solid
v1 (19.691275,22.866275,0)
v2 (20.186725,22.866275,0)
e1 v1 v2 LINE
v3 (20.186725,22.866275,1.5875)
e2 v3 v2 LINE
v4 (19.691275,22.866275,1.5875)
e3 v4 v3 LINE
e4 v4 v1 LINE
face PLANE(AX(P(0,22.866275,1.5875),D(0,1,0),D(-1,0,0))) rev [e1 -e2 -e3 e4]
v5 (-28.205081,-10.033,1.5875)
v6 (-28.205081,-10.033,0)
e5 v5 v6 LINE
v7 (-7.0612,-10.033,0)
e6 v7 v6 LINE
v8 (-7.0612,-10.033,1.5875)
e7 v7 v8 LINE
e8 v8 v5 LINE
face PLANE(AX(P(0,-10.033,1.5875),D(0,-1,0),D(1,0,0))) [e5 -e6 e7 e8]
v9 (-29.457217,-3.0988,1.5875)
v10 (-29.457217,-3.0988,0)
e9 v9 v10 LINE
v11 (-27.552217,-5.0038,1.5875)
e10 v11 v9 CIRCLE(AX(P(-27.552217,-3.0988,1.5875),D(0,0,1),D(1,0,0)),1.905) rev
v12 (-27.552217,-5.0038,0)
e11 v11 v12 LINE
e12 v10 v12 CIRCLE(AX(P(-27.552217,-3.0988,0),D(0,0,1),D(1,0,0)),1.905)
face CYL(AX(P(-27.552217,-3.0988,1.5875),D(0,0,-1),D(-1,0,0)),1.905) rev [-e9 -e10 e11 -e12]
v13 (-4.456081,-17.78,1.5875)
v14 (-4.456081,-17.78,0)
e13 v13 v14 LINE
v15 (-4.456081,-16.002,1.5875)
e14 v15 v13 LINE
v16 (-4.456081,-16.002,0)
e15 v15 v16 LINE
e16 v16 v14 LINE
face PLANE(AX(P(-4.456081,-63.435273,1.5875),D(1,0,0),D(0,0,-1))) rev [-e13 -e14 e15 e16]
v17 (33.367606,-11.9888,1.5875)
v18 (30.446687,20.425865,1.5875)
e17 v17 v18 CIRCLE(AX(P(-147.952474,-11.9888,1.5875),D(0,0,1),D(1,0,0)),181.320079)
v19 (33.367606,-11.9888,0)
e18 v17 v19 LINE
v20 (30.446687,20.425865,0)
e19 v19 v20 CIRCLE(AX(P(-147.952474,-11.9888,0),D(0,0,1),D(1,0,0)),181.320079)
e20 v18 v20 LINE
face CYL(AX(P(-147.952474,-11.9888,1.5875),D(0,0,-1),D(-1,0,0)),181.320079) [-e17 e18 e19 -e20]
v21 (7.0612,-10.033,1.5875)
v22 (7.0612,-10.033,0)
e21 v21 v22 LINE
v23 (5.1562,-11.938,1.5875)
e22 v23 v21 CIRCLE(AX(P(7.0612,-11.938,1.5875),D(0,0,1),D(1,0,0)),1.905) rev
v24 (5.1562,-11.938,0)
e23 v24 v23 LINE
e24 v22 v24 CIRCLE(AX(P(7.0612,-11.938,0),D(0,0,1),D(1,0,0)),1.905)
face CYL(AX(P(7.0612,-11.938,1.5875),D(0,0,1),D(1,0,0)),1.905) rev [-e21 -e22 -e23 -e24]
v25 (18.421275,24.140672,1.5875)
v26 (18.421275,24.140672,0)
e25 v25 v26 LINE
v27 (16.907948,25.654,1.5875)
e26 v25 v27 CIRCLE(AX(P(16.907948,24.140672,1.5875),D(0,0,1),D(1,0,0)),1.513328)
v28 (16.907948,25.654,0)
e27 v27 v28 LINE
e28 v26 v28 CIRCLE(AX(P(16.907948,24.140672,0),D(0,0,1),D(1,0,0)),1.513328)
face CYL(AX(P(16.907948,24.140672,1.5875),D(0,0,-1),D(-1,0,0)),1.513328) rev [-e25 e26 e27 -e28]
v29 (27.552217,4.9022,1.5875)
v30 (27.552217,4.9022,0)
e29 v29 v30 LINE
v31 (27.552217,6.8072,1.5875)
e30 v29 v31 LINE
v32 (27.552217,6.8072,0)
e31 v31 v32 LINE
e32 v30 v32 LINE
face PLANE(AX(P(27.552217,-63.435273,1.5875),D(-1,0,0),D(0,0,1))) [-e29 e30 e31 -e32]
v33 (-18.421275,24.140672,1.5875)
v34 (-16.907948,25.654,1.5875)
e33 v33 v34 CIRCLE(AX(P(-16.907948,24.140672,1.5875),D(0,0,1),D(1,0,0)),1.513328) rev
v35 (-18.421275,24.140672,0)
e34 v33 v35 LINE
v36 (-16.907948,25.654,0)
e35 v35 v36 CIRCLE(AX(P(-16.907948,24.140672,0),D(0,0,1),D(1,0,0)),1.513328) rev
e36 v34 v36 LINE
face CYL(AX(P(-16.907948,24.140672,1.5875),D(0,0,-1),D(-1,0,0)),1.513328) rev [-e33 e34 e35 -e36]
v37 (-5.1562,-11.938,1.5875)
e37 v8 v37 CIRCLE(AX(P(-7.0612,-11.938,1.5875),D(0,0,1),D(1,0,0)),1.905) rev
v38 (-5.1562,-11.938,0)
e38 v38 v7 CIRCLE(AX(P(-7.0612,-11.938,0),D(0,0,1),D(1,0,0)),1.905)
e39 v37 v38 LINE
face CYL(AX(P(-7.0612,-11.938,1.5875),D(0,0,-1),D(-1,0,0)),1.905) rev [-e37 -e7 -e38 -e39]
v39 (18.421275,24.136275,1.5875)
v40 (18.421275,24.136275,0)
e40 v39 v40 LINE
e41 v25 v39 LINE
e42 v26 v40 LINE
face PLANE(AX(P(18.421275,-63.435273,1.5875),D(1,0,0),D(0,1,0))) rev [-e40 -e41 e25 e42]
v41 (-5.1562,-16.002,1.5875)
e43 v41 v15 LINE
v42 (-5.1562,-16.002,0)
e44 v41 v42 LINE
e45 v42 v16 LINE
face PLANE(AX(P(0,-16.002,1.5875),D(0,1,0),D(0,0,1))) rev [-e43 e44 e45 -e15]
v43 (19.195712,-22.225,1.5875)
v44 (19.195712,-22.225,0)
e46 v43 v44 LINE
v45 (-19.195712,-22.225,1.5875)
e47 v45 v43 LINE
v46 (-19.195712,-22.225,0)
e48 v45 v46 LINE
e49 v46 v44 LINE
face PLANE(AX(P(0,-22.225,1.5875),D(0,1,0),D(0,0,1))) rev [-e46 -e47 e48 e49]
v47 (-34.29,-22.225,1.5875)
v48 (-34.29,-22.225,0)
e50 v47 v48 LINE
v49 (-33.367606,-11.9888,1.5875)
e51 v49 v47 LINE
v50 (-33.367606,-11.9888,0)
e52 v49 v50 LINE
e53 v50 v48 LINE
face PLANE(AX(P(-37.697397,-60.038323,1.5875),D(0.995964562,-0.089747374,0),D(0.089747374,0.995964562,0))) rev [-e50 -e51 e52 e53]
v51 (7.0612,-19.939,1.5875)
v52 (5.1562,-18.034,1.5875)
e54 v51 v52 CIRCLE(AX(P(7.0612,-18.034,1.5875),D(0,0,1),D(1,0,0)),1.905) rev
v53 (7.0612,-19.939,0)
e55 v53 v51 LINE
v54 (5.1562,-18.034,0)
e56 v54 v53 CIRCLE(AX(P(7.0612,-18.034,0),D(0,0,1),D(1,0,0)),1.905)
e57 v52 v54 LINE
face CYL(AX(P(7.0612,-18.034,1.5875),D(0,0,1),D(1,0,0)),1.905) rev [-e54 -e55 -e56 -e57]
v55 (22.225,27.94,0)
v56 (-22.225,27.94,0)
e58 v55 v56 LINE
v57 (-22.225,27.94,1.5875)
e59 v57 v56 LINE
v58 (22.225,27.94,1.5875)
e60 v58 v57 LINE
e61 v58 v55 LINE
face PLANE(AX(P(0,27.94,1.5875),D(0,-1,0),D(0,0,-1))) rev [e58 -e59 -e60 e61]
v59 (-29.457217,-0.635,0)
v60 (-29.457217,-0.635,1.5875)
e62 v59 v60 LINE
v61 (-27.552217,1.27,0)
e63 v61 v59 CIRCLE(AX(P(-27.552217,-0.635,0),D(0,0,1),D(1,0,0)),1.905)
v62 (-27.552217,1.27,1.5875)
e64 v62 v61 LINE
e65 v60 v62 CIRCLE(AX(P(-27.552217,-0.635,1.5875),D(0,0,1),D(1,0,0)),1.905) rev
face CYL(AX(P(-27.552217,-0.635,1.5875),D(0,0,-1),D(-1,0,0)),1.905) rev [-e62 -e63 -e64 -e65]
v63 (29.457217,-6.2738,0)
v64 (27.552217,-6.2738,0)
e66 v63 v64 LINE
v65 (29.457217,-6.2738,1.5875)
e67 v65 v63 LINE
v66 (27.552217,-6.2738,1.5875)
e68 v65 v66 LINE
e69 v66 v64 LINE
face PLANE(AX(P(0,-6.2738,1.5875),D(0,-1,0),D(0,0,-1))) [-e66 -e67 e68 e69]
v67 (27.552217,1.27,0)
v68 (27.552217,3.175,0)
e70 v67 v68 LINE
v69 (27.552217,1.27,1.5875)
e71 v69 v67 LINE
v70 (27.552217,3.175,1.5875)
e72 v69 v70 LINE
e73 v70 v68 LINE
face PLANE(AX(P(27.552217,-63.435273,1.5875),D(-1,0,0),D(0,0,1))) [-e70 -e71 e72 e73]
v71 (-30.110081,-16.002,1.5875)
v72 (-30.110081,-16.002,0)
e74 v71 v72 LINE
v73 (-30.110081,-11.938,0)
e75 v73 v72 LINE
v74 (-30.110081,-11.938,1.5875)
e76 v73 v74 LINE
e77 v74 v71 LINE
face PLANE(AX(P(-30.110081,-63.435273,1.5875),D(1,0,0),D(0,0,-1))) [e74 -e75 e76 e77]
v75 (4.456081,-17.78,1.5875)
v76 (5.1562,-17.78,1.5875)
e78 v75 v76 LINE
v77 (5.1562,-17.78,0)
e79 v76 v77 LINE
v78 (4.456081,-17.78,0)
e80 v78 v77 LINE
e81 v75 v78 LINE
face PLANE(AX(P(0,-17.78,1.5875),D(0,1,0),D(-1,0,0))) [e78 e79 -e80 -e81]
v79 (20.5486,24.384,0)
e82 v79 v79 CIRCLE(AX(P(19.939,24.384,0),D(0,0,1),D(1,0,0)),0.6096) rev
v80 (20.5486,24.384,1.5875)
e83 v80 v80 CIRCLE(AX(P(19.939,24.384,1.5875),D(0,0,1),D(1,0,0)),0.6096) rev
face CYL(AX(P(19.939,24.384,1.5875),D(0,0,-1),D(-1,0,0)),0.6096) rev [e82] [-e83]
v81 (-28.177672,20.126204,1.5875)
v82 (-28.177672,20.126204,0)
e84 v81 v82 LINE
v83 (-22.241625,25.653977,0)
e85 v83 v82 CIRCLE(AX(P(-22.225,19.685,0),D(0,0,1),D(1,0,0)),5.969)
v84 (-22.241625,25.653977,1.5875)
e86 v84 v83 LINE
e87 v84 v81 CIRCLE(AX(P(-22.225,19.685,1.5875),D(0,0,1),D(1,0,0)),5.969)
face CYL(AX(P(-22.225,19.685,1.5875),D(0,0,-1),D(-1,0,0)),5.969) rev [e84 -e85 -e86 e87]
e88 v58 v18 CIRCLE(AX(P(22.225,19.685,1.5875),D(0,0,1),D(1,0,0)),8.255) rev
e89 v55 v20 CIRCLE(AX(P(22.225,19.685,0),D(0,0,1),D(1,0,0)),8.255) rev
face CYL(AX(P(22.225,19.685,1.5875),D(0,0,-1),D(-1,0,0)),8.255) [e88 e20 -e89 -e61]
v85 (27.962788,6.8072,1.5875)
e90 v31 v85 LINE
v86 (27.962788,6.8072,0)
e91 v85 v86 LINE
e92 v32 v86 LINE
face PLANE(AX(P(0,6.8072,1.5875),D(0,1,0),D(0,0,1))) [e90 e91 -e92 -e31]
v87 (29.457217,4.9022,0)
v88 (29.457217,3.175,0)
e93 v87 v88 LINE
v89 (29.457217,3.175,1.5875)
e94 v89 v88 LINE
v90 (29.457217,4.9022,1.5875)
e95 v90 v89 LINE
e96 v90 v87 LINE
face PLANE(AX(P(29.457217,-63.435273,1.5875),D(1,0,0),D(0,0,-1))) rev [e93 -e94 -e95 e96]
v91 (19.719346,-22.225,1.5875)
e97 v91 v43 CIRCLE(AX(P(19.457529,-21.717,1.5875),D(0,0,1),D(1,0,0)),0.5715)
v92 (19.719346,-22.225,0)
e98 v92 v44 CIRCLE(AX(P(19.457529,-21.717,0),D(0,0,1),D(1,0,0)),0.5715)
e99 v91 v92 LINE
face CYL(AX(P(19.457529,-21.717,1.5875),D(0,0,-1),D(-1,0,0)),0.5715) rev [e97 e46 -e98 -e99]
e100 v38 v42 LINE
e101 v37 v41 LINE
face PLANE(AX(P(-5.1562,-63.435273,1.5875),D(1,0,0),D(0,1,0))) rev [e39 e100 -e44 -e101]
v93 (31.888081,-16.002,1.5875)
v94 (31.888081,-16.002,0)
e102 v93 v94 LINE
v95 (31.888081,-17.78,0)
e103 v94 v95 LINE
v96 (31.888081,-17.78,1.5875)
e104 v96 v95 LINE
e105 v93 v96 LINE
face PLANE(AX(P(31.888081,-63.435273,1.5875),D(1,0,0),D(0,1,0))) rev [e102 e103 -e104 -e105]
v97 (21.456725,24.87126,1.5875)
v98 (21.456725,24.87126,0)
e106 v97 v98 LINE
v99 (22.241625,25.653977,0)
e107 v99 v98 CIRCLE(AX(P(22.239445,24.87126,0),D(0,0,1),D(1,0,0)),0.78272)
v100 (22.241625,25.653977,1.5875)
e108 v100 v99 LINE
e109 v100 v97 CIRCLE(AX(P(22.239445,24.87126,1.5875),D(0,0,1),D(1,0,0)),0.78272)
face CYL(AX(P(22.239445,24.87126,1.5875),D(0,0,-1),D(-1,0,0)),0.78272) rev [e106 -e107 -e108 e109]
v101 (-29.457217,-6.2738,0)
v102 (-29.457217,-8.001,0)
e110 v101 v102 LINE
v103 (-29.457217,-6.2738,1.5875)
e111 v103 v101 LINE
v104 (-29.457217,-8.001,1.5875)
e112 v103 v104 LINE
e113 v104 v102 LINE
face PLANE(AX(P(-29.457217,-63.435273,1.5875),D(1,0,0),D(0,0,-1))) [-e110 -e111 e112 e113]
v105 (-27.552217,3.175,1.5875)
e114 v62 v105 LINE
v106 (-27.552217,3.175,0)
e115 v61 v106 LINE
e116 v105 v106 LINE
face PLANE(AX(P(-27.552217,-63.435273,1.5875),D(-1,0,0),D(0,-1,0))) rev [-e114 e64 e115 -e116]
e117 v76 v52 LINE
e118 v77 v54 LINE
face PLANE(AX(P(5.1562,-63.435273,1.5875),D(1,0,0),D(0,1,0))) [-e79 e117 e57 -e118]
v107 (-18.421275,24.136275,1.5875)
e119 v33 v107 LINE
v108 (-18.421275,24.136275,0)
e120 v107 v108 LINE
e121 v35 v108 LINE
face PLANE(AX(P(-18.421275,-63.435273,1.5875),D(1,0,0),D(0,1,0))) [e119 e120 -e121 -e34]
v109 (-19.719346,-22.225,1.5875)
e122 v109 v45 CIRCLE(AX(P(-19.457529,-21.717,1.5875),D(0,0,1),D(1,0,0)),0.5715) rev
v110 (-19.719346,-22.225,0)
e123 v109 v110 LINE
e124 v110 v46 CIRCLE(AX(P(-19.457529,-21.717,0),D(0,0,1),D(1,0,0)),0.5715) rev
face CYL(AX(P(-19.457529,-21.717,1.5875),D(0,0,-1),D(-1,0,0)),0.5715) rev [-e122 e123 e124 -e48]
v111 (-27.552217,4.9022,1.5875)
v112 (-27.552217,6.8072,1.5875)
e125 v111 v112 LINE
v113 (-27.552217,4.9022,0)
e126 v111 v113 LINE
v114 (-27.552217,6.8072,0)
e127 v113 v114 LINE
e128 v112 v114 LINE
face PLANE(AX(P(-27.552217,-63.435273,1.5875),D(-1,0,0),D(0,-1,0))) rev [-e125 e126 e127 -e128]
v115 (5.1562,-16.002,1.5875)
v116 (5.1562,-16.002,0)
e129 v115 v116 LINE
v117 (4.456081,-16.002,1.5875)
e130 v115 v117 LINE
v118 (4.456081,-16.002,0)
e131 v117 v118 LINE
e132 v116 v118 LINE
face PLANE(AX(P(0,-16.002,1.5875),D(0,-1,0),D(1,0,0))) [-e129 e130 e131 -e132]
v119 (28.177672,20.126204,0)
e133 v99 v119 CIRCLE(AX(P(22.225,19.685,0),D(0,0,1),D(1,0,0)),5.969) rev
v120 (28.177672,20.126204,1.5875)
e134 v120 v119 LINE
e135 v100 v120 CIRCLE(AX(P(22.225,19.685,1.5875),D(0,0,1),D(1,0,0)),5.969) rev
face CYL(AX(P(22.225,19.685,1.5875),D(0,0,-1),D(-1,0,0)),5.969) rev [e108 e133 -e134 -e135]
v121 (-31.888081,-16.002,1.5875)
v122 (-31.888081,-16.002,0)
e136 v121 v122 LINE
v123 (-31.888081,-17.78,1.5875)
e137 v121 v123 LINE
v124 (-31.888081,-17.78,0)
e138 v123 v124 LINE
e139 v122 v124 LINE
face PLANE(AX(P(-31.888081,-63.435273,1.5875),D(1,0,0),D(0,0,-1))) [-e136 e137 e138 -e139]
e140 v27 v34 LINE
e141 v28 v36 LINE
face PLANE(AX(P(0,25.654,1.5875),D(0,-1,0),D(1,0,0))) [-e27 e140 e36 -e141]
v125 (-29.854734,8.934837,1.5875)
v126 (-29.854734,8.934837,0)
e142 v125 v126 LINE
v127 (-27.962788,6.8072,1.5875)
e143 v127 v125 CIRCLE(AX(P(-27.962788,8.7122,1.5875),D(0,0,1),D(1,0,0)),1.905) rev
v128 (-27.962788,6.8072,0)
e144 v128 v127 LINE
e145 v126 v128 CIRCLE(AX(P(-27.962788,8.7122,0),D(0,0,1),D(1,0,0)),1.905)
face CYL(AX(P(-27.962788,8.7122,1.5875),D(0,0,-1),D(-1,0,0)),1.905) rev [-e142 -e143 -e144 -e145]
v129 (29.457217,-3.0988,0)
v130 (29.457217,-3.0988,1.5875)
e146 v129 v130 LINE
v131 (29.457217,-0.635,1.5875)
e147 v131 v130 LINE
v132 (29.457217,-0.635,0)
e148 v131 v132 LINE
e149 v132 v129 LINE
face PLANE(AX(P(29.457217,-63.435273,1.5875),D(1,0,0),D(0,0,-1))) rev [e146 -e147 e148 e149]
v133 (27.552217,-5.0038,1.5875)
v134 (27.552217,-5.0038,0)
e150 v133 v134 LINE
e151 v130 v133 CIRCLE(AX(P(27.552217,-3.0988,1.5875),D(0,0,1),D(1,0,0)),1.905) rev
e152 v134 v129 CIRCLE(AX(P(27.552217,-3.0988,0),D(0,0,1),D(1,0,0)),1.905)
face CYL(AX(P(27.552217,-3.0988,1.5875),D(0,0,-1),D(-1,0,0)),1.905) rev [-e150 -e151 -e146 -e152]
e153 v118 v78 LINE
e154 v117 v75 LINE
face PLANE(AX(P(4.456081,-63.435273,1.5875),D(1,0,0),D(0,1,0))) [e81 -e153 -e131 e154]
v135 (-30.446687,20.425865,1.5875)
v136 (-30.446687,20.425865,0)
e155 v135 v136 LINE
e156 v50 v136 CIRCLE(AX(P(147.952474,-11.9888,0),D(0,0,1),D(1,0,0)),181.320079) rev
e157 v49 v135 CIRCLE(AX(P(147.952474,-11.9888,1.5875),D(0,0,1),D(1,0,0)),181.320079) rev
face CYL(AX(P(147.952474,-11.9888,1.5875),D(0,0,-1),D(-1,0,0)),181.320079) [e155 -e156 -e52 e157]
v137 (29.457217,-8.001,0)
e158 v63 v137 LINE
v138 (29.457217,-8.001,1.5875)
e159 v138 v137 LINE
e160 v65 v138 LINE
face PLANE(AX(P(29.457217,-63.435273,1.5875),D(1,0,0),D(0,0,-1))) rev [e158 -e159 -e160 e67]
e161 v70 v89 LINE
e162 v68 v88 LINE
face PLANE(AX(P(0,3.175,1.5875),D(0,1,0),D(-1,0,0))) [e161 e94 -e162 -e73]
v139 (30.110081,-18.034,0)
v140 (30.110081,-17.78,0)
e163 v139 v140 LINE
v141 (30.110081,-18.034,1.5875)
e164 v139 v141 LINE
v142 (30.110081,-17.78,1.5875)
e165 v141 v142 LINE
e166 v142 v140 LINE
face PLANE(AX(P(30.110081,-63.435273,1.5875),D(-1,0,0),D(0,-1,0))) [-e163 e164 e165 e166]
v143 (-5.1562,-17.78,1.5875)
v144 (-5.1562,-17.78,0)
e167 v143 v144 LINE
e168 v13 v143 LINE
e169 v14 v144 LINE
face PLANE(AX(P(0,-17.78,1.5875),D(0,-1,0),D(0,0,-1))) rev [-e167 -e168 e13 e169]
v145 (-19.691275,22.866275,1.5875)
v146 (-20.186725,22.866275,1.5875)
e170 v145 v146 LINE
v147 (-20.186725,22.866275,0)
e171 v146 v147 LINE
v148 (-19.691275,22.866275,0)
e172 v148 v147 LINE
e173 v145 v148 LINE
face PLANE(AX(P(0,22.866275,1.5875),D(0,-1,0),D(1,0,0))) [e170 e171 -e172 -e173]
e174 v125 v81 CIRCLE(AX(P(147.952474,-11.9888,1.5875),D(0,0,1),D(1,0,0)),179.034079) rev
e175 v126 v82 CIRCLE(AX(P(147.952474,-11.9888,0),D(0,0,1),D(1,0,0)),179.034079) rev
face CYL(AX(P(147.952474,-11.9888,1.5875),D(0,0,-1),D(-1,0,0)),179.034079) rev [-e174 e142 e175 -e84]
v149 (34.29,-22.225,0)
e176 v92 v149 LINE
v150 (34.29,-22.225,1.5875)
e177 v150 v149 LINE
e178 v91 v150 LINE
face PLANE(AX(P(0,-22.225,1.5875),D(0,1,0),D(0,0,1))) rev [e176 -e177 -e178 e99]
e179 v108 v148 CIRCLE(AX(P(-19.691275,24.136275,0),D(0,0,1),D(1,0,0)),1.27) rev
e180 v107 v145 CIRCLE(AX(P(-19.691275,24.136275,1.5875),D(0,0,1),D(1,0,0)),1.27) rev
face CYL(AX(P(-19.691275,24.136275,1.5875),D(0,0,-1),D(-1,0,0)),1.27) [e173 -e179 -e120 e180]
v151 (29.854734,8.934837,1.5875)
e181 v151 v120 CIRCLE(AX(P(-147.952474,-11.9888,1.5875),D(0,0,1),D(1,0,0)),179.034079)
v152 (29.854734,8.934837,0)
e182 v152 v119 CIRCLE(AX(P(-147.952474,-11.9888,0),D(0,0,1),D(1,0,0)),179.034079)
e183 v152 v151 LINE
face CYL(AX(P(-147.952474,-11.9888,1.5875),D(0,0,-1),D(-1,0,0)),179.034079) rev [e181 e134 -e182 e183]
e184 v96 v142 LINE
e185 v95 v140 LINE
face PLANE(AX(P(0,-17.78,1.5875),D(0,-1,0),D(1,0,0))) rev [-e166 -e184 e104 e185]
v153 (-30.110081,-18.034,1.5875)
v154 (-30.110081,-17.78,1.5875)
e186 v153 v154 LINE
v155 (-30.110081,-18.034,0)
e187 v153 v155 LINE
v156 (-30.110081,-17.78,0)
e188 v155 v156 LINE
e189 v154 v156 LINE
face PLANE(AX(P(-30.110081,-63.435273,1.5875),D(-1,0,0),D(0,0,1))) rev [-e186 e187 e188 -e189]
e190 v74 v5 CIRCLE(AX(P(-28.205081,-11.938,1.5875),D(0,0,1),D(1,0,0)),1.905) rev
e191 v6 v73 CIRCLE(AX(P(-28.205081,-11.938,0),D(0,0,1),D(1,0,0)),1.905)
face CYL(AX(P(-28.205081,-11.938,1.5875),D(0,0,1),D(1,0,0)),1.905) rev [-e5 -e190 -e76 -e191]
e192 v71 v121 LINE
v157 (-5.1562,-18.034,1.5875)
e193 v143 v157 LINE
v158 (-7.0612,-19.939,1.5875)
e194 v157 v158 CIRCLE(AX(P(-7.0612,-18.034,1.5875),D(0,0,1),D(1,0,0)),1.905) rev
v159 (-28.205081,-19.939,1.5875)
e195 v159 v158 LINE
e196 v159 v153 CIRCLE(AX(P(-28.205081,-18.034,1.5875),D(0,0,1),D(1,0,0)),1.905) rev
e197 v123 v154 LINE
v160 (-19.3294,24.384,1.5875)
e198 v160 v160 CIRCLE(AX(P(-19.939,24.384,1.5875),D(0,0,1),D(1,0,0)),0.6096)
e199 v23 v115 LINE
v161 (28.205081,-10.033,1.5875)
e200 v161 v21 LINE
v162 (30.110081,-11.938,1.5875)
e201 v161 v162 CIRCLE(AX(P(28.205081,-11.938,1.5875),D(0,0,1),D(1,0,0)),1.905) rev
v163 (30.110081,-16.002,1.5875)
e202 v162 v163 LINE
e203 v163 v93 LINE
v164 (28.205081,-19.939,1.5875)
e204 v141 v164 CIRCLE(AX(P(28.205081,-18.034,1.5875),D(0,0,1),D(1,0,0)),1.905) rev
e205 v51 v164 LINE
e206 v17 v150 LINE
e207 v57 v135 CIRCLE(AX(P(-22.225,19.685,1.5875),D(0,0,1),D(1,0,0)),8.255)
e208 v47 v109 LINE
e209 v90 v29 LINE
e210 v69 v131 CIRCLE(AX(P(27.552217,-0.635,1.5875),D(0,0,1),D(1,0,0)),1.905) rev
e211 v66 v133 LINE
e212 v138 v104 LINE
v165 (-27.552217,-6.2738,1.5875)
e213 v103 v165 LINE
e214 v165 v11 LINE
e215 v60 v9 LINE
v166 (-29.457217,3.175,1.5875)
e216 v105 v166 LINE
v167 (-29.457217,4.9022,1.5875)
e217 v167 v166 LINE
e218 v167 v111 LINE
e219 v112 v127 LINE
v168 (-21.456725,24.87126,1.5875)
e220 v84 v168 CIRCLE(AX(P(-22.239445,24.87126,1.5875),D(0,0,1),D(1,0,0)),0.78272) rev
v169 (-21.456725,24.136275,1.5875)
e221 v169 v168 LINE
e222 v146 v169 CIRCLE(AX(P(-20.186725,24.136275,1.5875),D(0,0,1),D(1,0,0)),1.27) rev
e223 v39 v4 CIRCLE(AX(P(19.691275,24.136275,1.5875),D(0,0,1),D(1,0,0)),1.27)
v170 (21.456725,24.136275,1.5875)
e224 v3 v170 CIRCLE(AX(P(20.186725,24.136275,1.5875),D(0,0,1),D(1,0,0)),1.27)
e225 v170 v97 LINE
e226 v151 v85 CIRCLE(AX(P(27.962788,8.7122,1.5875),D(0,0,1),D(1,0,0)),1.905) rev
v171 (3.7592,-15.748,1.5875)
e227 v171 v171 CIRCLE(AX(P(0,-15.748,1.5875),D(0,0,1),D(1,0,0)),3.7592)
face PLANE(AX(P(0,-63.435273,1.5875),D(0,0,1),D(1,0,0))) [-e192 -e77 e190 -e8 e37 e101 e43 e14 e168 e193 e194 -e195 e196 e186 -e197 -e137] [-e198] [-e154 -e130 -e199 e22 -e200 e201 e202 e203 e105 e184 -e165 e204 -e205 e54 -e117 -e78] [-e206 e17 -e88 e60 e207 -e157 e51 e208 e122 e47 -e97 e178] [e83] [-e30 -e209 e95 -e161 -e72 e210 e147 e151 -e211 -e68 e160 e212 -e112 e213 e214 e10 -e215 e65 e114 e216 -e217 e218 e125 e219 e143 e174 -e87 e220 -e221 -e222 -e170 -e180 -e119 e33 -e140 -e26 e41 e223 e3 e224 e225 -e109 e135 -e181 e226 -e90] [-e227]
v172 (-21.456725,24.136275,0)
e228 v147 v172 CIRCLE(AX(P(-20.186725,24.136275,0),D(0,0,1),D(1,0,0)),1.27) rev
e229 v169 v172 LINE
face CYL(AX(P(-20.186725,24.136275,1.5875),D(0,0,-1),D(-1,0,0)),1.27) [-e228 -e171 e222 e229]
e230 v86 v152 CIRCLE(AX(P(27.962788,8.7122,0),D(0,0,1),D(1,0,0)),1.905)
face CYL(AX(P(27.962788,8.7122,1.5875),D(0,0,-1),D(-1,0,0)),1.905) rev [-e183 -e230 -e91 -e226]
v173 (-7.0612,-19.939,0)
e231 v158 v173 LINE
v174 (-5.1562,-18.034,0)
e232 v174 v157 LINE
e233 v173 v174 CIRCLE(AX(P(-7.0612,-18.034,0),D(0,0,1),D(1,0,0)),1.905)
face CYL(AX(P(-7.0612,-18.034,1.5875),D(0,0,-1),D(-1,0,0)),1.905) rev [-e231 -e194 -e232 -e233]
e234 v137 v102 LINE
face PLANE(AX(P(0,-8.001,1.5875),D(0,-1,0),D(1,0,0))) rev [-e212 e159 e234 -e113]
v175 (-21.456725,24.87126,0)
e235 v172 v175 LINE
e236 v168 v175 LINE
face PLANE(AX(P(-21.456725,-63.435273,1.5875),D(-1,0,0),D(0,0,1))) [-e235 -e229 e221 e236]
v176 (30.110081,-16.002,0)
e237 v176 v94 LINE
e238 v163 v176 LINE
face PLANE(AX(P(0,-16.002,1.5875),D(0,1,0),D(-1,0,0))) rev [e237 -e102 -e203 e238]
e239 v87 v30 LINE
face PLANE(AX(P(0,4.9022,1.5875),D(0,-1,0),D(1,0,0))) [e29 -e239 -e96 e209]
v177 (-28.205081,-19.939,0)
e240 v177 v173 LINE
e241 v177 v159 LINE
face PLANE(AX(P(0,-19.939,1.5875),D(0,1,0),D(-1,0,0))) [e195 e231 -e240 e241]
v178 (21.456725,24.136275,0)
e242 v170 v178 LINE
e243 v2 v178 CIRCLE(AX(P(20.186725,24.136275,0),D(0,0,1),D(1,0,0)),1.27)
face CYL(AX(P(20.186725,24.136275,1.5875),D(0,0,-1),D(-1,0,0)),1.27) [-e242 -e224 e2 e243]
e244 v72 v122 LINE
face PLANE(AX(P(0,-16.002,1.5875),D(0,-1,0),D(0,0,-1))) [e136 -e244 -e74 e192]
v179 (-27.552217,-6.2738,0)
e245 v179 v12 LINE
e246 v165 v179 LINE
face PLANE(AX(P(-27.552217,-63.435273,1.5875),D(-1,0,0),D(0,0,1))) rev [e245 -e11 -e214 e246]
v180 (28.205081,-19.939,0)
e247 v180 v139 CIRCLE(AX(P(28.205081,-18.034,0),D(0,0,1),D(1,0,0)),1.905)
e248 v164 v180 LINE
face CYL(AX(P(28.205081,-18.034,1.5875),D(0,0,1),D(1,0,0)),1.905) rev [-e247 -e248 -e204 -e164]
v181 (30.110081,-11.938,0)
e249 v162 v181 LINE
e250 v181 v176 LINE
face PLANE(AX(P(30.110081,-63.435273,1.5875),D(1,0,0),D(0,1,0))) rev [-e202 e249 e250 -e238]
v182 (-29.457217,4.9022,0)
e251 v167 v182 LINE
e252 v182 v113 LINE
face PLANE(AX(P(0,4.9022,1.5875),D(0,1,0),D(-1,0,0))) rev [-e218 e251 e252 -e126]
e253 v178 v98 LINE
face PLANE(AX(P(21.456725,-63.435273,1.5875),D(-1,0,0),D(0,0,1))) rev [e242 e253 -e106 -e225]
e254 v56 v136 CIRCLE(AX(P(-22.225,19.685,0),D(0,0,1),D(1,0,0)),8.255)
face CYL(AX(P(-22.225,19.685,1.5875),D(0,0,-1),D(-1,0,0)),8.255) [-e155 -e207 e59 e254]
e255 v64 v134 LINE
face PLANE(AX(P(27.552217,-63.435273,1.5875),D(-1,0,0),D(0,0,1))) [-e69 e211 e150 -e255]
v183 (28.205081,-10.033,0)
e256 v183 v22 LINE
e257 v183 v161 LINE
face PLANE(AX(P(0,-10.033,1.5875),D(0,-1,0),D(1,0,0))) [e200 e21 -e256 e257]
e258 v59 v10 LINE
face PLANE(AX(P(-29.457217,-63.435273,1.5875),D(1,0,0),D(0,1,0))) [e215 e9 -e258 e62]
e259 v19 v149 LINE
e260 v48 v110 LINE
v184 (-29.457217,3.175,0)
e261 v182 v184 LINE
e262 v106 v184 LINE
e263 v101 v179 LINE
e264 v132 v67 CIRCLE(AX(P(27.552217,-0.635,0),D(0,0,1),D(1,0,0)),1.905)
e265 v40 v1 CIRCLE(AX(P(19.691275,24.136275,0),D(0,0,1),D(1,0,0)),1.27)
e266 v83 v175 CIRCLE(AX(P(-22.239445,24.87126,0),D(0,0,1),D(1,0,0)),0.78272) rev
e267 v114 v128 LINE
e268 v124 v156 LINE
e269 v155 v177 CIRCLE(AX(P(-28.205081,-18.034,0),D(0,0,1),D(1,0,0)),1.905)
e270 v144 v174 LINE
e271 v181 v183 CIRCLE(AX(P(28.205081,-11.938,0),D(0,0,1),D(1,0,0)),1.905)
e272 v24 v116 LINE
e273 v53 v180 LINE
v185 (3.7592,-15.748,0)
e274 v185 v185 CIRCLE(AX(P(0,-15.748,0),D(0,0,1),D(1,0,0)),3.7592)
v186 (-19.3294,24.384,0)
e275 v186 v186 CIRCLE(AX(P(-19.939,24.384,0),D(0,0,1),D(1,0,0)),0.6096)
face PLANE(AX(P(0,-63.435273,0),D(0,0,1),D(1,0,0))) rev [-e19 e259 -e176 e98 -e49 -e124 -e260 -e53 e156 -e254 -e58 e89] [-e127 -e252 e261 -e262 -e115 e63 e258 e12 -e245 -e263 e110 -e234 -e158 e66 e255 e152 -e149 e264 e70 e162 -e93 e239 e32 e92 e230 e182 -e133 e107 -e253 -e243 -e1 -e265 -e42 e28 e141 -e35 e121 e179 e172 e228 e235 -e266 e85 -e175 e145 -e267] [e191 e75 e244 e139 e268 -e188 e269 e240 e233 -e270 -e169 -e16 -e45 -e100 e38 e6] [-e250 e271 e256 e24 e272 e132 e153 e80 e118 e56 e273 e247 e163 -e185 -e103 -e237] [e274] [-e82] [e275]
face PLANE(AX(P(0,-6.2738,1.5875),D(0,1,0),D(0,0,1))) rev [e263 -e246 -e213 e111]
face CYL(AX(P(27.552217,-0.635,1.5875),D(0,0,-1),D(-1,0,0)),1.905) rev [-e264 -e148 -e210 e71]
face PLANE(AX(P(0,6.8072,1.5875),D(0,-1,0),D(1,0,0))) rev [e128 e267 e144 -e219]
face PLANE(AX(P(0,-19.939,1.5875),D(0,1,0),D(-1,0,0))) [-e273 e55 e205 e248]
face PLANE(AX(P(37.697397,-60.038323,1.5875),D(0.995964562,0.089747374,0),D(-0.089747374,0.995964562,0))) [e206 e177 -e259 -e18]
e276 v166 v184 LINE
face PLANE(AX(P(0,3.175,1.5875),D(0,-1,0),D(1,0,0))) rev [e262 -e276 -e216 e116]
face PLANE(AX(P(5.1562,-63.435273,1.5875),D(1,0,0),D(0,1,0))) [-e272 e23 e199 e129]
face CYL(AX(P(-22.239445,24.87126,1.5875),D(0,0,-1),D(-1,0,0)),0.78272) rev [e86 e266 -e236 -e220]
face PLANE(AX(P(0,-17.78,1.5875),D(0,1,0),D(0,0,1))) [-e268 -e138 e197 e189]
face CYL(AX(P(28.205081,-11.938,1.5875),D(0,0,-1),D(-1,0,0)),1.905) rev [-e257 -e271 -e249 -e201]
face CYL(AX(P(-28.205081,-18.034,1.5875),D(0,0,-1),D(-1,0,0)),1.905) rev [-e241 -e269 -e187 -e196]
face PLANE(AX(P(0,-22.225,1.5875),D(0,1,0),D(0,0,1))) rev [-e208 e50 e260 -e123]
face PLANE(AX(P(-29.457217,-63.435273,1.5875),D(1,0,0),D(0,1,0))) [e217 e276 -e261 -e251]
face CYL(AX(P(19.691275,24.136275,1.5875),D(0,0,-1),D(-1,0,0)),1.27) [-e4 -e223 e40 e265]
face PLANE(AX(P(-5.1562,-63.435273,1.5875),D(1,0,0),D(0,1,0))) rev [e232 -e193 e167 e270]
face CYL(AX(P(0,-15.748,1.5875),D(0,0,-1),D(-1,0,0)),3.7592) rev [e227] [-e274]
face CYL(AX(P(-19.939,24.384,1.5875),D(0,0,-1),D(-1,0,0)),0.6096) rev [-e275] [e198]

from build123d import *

# Parameters (mm, degrees)
SKETCH1_R           = 3.7592
SKETCH1_R_2         = 0.6096
BOSS_EXTRUDE1_DEPTH = 1.5875
FILLET1_R           = 1.905
FILLET2_R           = 1.905


with BuildPart() as part:
    # Sketch1 → Boss-Extrude1 (new body)
    with BuildSketch(Plane.XY):
        with BuildLine():
            Line((34.29, -22.225), (33.367605666, -11.9888))
            ThreePointArc((33.367605666, -11.9888), (32.635899737, 4.284200971), (30.44668746, 20.425864572))
            ThreePointArc((30.44668746, 20.425864572), (27.794074787, 25.778474462), (22.225, 27.94))
            Line((22.225, 27.94), (-22.225, 27.94))
            ThreePointArc((-22.225, 27.94), (-27.794074787, 25.778474462), (-30.44668746, 20.425864572))
            ThreePointArc((-30.44668746, 20.425864572), (-32.635899737, 4.284200971), (-33.367605666, -11.9888))
            Line((-33.367605666, -11.9888), (-34.29, -22.225))
            Line((-34.29, -22.225), (-19.719346062, -22.225))
            ThreePointArc((-19.719346062, -22.225), (-19.755004666, -21.229024189), (-18.886028855, -21.717))
            ThreePointArc((-18.886028855, -21.717), (-18.969553044, -22.014475811), (-19.195711648, -22.225))
            Line((-19.195711648, -22.225), (19.195711648, -22.225))
            ThreePointArc((19.195711648, -22.225), (19.160053044, -21.229024189), (20.029028855, -21.717))
            ThreePointArc((20.029028855, -21.717), (19.945504666, -22.014475811), (19.719346062, -22.225))
            Line((19.719346062, -22.225), (34.29, -22.225))
        make_face()
        Polygon((-5.1562, -19.939), (-30.110080889, -19.939), (-30.110080889, -17.78), (-31.888080889, -17.78), (-31.888080889, -16.002), (-30.110080889, -16.002), (-30.110080889, -10.033), (-5.1562, -10.033), (-5.1562, -16.002), (-4.456080889, -16.002), (-4.456080889, -17.78), (-5.1562, -17.78), align=None, mode=Mode.SUBTRACT)
        with Locations((0, -15.748)):
            Circle(SKETCH1_R, mode=Mode.SUBTRACT)
        Polygon((5.1562, -19.939), (5.1562, -17.78), (4.456080889, -17.78), (4.456080889, -16.002), (5.1562, -16.002), (5.1562, -10.033), (30.110080889, -10.033), (30.110080889, -16.002), (31.888080889, -16.002), (31.888080889, -17.78), (30.110080889, -17.78), (30.110080889, -19.939), align=None, mode=Mode.SUBTRACT)
        with BuildLine():
            Line((-16.907947674, 25.654), (16.907947674, 25.654))
            ThreePointArc((16.907947674, 25.654), (17.978031977, 25.210756569), (18.421275408, 24.140672267))
            Line((18.421275408, 24.140672267), (18.421275408, 24.136275408))
            ThreePointArc((18.421275408, 24.136275408), (18.793249795, 23.238249795), (19.691275408, 22.866275408))
            Line((19.691275408, 22.866275408), (20.186724592, 22.866275408))
            ThreePointArc((20.186724592, 22.866275408), (21.084750205, 23.238249795), (21.456724592, 24.136275408))
            Line((21.456724592, 24.136275408), (21.456724592, 24.871259676))
            ThreePointArc((21.456724592, 24.871259676), (21.686749328, 25.425496663), (22.24162483, 25.653976848))
            ThreePointArc((22.24162483, 25.653976848), (26.292824304, 24.053268127), (28.177671702, 20.126203591))
            ThreePointArc((28.177671702, 20.126203591), (29.260117929, 13.484694907), (30.092217203, 6.8072))
            Line((30.092217203, 6.8072), (27.552217203, 6.8072))
            Line((27.552217203, 6.8072), (27.552217203, 4.9022))
            Line((27.552217203, 4.9022), (29.457217203, 4.9022))
            Line((29.457217203, 4.9022), (29.457217203, 3.175))
            Line((29.457217203, 3.175), (27.552217203, 3.175))
            Line((27.552217203, 3.175), (27.552217203, 1.27))
            Line((27.552217203, 1.27), (29.457217203, 1.27))
            Line((29.457217203, 1.27), (29.457217203, -5.0038))
            Line((29.457217203, -5.0038), (27.552217203, -5.0038))
            Line((27.552217203, -5.0038), (27.552217203, -6.2738))
            Line((27.552217203, -6.2738), (29.457217203, -6.2738))
            Line((29.457217203, -6.2738), (29.457217203, -8.001))
            Line((29.457217203, -8.001), (-29.457217203, -8.001))
            Line((-29.457217203, -8.001), (-29.457217203, -6.2738))
            Line((-29.457217203, -6.2738), (-27.552217203, -6.2738))
            Line((-27.552217203, -6.2738), (-27.552217203, -5.0038))
            Line((-27.552217203, -5.0038), (-29.457217203, -5.0038))
            Line((-29.457217203, -5.0038), (-29.457217203, 1.27))
            Line((-29.457217203, 1.27), (-27.552217203, 1.27))
            Line((-27.552217203, 1.27), (-27.552217203, 3.175))
            Line((-27.552217203, 3.175), (-29.457217203, 3.175))
            Line((-29.457217203, 3.175), (-29.457217203, 4.9022))
            Line((-29.457217203, 4.9022), (-27.552217203, 4.9022))
            Line((-27.552217203, 4.9022), (-27.552217203, 6.8072))
            Line((-27.552217203, 6.8072), (-30.092217203, 6.8072))
            ThreePointArc((-30.092217203, 6.8072), (-29.260117929, 13.484694907), (-28.177671702, 20.126203591))
            ThreePointArc((-28.177671702, 20.126203591), (-26.292824304, 24.053268127), (-22.24162483, 25.653976848))
            ThreePointArc((-22.24162483, 25.653976848), (-21.686749328, 25.425496663), (-21.456724592, 24.871259676))
            Line((-21.456724592, 24.871259676), (-21.456724592, 24.136275408))
            ThreePointArc((-21.456724592, 24.136275408), (-21.084750205, 23.238249795), (-20.186724592, 22.866275408))
            Line((-20.186724592, 22.866275408), (-19.691275408, 22.866275408))
            ThreePointArc((-19.691275408, 22.866275408), (-18.793249795, 23.238249795), (-18.421275408, 24.136275408))
            Line((-18.421275408, 24.136275408), (-18.421275408, 24.140672267))
            ThreePointArc((-18.421275408, 24.140672267), (-17.978031977, 25.210756569), (-16.907947674, 25.654))
        make_face(mode=Mode.SUBTRACT)
        with Locations((-19.939, 24.384)):
            Circle(SKETCH1_R_2, mode=Mode.SUBTRACT)
        with Locations((19.939, 24.384)):
            Circle(SKETCH1_R_2, mode=Mode.SUBTRACT)
    extrude(amount=BOSS_EXTRUDE1_DEPTH)

    # Fillet1
    fillet1_edges = [part.edges().sort_by_distance(p)[0] for p in [
        (5.1562, -19.939, 0.79375),
        (30.110080889, -19.939, 0.79375),
        (30.110080889, -10.033, 0.79375),
        (5.1562, -10.033, 0.79375),
        (-5.1562, -19.939, 0.79375),
        (-5.1562, -10.033, 0.79375),
        (-30.110080889, -10.033, 0.79375),
        (-30.110080889, -19.939, 0.79375),
    ]]
    fillet(fillet1_edges, radius=FILLET1_R)

    # Fillet2
    fillet2_edges = [part.edges().sort_by_distance(p)[0] for p in [
        (-29.457217203, 1.27, 0.79375),
        (-29.457217203, -5.0038, 0.79375),
        (-30.092217203, 6.8072, 0.79375),
        (29.457217203, -5.0038, 0.79375),
        (29.457217203, 1.27, 0.79375),
        (30.092217203, 6.8072, 0.79375),
    ]]
    fillet(fillet2_edges, radius=FILLET2_R - 0.0001)  # a hair under: the kernel refuses the full size


solid = part.part
